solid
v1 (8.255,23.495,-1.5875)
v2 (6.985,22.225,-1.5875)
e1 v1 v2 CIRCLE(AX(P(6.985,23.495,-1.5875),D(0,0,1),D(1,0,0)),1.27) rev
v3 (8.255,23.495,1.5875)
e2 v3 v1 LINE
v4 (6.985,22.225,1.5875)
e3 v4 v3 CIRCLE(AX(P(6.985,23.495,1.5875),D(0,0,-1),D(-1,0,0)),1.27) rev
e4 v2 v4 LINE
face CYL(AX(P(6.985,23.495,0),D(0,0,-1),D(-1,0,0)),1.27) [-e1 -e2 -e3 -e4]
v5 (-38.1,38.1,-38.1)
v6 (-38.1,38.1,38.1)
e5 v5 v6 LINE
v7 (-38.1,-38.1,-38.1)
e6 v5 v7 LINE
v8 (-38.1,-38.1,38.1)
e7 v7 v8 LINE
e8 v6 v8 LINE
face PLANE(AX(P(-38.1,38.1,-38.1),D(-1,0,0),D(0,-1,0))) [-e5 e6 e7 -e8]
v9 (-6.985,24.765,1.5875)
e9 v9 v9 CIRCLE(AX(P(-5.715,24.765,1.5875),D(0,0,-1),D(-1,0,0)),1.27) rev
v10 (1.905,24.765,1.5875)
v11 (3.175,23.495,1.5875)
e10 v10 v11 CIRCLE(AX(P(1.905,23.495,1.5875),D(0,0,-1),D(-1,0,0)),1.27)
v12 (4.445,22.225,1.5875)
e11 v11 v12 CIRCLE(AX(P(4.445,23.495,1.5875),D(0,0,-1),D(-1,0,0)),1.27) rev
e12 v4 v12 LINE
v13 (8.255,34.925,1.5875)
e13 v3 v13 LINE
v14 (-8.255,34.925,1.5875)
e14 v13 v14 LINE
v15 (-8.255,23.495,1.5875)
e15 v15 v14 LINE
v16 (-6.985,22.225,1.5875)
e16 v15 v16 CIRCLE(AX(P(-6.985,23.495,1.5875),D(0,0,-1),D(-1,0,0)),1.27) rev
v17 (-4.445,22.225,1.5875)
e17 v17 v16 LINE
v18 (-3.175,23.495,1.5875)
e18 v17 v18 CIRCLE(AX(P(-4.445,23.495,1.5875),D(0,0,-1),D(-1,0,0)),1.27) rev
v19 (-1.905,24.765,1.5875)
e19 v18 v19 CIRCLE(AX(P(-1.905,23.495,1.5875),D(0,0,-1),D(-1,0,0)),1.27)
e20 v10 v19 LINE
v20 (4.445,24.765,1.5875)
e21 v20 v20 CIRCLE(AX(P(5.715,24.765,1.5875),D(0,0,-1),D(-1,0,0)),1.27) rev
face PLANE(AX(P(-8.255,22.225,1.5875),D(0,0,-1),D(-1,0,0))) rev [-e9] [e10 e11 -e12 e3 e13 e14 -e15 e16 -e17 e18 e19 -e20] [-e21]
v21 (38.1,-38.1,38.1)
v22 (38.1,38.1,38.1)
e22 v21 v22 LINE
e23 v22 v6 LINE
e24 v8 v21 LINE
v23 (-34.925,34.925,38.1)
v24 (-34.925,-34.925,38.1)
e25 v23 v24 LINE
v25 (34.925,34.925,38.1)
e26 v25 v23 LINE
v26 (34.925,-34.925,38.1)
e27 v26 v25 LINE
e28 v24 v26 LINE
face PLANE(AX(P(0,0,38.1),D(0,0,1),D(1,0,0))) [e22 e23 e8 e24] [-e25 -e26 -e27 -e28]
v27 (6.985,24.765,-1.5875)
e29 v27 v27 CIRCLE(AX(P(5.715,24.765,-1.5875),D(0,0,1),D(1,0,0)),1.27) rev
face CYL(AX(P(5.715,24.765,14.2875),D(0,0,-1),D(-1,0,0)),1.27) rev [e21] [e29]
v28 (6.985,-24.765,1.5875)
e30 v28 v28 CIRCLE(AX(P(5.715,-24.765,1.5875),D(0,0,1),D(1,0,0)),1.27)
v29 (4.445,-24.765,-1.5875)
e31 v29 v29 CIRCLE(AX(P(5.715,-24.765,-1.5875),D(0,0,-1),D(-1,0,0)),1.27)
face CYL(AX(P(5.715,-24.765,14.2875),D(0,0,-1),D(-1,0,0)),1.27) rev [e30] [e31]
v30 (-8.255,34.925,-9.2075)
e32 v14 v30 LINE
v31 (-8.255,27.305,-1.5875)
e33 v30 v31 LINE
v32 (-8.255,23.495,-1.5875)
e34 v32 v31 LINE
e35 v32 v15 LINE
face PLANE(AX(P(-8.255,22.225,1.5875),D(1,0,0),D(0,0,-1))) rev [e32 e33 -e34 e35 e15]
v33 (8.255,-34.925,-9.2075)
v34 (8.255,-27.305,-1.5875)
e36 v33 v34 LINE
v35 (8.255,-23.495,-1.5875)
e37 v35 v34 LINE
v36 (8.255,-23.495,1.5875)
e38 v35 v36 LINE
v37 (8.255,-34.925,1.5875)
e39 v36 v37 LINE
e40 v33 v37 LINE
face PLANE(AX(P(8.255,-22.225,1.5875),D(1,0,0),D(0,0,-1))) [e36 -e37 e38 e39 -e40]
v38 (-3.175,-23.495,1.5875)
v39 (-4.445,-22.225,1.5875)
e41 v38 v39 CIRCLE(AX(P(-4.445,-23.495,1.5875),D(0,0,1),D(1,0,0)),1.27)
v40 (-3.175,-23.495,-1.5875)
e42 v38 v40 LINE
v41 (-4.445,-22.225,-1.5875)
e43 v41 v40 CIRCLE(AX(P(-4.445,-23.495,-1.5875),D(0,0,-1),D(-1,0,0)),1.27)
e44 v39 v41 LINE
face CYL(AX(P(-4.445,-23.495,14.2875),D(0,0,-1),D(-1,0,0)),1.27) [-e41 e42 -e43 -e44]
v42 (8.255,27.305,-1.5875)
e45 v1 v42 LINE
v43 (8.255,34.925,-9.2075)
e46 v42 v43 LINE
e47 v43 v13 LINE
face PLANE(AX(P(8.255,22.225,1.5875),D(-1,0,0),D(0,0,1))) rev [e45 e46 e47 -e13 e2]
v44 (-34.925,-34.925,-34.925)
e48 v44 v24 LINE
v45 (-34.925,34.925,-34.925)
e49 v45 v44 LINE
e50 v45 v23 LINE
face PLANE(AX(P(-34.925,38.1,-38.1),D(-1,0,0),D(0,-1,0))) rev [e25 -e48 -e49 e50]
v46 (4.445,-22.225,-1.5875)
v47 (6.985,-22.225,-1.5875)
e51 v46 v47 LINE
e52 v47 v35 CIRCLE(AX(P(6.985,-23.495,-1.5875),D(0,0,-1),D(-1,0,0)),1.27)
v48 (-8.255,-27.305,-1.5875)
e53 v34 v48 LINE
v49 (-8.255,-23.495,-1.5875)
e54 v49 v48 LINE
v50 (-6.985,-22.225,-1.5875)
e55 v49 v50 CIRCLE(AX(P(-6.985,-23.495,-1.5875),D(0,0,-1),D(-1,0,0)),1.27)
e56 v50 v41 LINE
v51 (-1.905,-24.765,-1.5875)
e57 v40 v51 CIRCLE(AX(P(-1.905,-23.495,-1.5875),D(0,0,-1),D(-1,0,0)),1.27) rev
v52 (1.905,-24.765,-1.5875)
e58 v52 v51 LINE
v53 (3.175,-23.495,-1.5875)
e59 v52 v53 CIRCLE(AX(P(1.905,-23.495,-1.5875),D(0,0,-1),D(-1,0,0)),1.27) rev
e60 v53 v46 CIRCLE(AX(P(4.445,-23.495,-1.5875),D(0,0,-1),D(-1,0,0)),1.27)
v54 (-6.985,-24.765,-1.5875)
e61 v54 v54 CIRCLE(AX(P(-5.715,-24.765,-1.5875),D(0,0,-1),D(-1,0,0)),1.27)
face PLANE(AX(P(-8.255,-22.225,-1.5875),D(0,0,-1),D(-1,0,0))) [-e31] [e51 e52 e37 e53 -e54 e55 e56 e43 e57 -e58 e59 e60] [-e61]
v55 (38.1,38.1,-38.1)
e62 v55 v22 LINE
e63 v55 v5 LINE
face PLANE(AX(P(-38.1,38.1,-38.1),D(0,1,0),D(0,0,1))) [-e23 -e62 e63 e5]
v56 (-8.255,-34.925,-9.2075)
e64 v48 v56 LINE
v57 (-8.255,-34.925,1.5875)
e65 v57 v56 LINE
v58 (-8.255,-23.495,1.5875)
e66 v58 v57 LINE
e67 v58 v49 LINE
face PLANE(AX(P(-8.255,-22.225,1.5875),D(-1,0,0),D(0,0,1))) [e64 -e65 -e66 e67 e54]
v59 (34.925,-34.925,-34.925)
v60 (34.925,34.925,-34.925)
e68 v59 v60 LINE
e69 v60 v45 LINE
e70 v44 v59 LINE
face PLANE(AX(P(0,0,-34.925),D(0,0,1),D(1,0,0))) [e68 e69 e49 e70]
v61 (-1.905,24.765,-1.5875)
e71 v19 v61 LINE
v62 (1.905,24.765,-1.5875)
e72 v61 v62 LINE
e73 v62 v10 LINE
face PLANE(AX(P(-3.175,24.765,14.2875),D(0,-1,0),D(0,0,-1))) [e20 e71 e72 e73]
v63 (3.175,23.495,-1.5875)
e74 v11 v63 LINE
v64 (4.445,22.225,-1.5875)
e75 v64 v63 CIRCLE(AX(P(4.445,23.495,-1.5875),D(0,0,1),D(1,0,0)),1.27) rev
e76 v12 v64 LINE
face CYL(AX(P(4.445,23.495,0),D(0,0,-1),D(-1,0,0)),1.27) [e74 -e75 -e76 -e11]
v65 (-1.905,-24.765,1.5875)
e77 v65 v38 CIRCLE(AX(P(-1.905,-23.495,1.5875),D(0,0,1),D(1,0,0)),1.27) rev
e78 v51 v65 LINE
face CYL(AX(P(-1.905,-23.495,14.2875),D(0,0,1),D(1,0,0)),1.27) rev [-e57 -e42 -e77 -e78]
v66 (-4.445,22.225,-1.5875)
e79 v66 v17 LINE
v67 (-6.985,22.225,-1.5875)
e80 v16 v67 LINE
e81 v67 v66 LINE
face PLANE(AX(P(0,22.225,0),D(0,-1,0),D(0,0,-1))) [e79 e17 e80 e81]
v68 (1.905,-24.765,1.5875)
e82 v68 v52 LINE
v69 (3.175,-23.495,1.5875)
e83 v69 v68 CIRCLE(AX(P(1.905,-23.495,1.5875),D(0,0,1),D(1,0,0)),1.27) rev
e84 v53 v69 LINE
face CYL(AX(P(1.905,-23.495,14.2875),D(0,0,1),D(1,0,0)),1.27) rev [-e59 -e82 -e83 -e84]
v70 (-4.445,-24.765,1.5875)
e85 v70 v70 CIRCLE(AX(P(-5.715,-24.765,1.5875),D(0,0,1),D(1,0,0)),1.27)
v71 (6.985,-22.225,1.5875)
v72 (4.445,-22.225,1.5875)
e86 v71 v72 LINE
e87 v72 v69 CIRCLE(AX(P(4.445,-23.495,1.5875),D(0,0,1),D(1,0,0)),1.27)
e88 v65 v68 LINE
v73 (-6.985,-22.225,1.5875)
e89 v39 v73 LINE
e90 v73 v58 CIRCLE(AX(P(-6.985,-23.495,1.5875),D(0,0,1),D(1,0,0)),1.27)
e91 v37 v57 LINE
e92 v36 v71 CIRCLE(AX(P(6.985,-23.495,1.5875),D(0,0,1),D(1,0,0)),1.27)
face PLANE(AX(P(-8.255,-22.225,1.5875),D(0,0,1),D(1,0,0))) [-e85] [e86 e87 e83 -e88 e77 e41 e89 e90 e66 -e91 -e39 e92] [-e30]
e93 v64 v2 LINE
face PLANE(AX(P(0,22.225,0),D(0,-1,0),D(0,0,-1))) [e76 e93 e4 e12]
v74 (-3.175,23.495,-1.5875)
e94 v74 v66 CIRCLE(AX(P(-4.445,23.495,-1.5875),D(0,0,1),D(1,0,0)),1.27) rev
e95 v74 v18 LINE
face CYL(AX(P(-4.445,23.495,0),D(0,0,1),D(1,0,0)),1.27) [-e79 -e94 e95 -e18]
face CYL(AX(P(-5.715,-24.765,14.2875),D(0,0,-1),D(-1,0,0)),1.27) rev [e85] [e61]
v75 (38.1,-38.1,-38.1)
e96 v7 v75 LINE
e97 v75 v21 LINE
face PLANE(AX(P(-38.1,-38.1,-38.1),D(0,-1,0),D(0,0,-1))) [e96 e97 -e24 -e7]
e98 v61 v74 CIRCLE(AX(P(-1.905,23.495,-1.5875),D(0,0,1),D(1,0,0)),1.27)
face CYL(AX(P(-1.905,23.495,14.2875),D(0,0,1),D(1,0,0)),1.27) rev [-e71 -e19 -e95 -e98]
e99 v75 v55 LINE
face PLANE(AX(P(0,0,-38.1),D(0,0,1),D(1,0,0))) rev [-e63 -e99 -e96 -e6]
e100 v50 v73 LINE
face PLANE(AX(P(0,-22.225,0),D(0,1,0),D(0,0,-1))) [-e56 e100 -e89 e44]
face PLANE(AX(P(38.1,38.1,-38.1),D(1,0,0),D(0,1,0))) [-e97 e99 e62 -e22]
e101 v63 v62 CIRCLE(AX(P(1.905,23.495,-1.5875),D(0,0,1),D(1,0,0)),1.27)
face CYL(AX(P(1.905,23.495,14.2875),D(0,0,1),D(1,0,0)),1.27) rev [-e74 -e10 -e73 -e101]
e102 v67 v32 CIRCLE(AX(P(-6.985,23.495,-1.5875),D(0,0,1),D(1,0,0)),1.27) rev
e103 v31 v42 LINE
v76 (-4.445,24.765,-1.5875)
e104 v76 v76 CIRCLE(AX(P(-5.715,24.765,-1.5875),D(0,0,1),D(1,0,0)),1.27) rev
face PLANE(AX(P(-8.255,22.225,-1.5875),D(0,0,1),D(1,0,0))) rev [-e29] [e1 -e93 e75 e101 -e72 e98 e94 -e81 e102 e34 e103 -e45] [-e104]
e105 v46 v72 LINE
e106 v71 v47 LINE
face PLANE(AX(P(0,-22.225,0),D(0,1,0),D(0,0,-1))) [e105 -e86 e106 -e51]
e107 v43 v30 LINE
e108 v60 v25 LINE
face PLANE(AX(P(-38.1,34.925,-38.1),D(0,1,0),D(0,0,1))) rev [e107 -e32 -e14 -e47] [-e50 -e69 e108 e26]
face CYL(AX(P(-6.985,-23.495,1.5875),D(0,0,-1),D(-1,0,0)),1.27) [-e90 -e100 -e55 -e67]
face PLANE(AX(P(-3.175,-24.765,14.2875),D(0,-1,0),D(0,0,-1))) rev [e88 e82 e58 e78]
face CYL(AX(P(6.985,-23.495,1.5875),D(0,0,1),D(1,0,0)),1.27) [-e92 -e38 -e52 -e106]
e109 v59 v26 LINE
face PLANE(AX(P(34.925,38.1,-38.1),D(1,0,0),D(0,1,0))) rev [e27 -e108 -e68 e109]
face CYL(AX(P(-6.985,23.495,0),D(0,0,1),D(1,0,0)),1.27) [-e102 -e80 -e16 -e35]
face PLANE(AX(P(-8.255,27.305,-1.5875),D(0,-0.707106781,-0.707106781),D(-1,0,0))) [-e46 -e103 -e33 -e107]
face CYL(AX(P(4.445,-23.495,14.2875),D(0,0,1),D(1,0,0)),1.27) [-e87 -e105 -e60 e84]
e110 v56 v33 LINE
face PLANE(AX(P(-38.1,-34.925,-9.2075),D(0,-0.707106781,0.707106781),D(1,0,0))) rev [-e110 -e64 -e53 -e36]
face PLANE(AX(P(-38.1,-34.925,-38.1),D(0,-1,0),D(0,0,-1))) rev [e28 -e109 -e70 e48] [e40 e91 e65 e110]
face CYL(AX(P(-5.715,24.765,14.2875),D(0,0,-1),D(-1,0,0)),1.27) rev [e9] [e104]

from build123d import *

# Parameters (mm, degrees)
BOSS_EXTRUDE1_DEPTH      = 38.1
BOSS_EXTRUDE1_DEPTH_BACK = 38.1
SKETCH1_W                = 76.2
SKETCH1_H                = 76.2
SHELL1_T                 = -3.175
SKETCH2_W                = 16.51
SKETCH2_H                = 3.175
BOSS_EXTRUDE2_DEPTH      = 12.7
SKETCH3_R                = 1.27
SKETCH3_W                = 6.35
SKETCH3_H                = 2.54
CUT_EXTRUDE1_DEPTH       = 12.7
FILLET1_R                = 1.27
FILLET1_OF_MIRROR2_R     = 1.27
CHAMFER1_SIZE            = 7.62


with BuildPart() as part:
    # Sketch1 → Boss-Extrude1 (new, two sides: drawn at the far end of the back side and taken through both)
    with BuildSketch(Plane.XY.offset(-BOSS_EXTRUDE1_DEPTH_BACK)):
        Rectangle(SKETCH1_W, SKETCH1_H)
    extrude(amount=BOSS_EXTRUDE1_DEPTH + BOSS_EXTRUDE1_DEPTH_BACK)

    # Shell1
    shell1_openings = [part.faces().sort_by_distance(p)[0] for p in [
        (0, 0, 38.1),
    ]]
    offset(amount=SHELL1_T, openings=shell1_openings, kind=Kind.INTERSECTION)

    # Sketch2 → Boss-Extrude2 (add)
    with BuildSketch(Plane.XZ.offset(-34.925)):
        Rectangle(SKETCH2_W, SKETCH2_H)
    boss_extrude2 = extrude(amount=BOSS_EXTRUDE2_DEPTH)

    # Sketch3 → Cut-Extrude1 (cut, symmetric)
    with BuildSketch(Plane.XY.offset(1.5875)):
        with Locations(Location((-5.715, 24.765, 0), (0, 0, 180))):
            Circle(SKETCH3_R)
        with Locations(Location((5.715, 24.765, 0), (0, 0, 180))):
            Circle(SKETCH3_R)
        with Locations((0, 23.495)):
            Rectangle(SKETCH3_W, SKETCH3_H)
    cut_extrude1 = extrude(amount=CUT_EXTRUDE1_DEPTH, both=True, mode=Mode.SUBTRACT)

    # Fillet1
    fillet1_edges = [part.edges().sort_by_distance(p)[0] for p in [
        (-3.175, 24.765, 0),
        (8.255, 22.225, 0),
        (3.175, 22.225, 0),
        (-3.175, 22.225, 0),
        (-8.255, 22.225, 0),
        (3.175, 24.765, 0),
    ]]
    fillet(fillet1_edges, radius=FILLET1_R - 0.0001)  # a hair under: the kernel refuses the full size

    # Mirror2: Boss-Extrude2, Cut-Extrude1 across plane
    add(boss_extrude2.mirror(Plane.ZX))
    add(cut_extrude1.mirror(Plane.ZX), mode=Mode.SUBTRACT)

    # Fillet1 of Mirror2
    fillet1_of_mirror2_edges = [part.edges().sort_by_distance(p)[0] for p in [
        (-3.175, -24.765, 0),
        (8.255, -22.225, 0),
        (3.175, -22.225, 0),
        (-3.175, -22.225, 0),
        (-8.255, -22.225, 0),
        (3.175, -24.765, 0),
    ]]
    fillet(fillet1_of_mirror2_edges, radius=FILLET1_OF_MIRROR2_R - 0.0001)  # a hair under: the kernel refuses the full size

    # Chamfer1
    chamfer1_edges = [part.edges().sort_by_distance(p)[0] for p in [
        (0, -34.925, -1.5875),
        (0, 34.925, -1.5875),
    ]]
    chamfer(chamfer1_edges, length=CHAMFER1_SIZE)


solid = part.part
